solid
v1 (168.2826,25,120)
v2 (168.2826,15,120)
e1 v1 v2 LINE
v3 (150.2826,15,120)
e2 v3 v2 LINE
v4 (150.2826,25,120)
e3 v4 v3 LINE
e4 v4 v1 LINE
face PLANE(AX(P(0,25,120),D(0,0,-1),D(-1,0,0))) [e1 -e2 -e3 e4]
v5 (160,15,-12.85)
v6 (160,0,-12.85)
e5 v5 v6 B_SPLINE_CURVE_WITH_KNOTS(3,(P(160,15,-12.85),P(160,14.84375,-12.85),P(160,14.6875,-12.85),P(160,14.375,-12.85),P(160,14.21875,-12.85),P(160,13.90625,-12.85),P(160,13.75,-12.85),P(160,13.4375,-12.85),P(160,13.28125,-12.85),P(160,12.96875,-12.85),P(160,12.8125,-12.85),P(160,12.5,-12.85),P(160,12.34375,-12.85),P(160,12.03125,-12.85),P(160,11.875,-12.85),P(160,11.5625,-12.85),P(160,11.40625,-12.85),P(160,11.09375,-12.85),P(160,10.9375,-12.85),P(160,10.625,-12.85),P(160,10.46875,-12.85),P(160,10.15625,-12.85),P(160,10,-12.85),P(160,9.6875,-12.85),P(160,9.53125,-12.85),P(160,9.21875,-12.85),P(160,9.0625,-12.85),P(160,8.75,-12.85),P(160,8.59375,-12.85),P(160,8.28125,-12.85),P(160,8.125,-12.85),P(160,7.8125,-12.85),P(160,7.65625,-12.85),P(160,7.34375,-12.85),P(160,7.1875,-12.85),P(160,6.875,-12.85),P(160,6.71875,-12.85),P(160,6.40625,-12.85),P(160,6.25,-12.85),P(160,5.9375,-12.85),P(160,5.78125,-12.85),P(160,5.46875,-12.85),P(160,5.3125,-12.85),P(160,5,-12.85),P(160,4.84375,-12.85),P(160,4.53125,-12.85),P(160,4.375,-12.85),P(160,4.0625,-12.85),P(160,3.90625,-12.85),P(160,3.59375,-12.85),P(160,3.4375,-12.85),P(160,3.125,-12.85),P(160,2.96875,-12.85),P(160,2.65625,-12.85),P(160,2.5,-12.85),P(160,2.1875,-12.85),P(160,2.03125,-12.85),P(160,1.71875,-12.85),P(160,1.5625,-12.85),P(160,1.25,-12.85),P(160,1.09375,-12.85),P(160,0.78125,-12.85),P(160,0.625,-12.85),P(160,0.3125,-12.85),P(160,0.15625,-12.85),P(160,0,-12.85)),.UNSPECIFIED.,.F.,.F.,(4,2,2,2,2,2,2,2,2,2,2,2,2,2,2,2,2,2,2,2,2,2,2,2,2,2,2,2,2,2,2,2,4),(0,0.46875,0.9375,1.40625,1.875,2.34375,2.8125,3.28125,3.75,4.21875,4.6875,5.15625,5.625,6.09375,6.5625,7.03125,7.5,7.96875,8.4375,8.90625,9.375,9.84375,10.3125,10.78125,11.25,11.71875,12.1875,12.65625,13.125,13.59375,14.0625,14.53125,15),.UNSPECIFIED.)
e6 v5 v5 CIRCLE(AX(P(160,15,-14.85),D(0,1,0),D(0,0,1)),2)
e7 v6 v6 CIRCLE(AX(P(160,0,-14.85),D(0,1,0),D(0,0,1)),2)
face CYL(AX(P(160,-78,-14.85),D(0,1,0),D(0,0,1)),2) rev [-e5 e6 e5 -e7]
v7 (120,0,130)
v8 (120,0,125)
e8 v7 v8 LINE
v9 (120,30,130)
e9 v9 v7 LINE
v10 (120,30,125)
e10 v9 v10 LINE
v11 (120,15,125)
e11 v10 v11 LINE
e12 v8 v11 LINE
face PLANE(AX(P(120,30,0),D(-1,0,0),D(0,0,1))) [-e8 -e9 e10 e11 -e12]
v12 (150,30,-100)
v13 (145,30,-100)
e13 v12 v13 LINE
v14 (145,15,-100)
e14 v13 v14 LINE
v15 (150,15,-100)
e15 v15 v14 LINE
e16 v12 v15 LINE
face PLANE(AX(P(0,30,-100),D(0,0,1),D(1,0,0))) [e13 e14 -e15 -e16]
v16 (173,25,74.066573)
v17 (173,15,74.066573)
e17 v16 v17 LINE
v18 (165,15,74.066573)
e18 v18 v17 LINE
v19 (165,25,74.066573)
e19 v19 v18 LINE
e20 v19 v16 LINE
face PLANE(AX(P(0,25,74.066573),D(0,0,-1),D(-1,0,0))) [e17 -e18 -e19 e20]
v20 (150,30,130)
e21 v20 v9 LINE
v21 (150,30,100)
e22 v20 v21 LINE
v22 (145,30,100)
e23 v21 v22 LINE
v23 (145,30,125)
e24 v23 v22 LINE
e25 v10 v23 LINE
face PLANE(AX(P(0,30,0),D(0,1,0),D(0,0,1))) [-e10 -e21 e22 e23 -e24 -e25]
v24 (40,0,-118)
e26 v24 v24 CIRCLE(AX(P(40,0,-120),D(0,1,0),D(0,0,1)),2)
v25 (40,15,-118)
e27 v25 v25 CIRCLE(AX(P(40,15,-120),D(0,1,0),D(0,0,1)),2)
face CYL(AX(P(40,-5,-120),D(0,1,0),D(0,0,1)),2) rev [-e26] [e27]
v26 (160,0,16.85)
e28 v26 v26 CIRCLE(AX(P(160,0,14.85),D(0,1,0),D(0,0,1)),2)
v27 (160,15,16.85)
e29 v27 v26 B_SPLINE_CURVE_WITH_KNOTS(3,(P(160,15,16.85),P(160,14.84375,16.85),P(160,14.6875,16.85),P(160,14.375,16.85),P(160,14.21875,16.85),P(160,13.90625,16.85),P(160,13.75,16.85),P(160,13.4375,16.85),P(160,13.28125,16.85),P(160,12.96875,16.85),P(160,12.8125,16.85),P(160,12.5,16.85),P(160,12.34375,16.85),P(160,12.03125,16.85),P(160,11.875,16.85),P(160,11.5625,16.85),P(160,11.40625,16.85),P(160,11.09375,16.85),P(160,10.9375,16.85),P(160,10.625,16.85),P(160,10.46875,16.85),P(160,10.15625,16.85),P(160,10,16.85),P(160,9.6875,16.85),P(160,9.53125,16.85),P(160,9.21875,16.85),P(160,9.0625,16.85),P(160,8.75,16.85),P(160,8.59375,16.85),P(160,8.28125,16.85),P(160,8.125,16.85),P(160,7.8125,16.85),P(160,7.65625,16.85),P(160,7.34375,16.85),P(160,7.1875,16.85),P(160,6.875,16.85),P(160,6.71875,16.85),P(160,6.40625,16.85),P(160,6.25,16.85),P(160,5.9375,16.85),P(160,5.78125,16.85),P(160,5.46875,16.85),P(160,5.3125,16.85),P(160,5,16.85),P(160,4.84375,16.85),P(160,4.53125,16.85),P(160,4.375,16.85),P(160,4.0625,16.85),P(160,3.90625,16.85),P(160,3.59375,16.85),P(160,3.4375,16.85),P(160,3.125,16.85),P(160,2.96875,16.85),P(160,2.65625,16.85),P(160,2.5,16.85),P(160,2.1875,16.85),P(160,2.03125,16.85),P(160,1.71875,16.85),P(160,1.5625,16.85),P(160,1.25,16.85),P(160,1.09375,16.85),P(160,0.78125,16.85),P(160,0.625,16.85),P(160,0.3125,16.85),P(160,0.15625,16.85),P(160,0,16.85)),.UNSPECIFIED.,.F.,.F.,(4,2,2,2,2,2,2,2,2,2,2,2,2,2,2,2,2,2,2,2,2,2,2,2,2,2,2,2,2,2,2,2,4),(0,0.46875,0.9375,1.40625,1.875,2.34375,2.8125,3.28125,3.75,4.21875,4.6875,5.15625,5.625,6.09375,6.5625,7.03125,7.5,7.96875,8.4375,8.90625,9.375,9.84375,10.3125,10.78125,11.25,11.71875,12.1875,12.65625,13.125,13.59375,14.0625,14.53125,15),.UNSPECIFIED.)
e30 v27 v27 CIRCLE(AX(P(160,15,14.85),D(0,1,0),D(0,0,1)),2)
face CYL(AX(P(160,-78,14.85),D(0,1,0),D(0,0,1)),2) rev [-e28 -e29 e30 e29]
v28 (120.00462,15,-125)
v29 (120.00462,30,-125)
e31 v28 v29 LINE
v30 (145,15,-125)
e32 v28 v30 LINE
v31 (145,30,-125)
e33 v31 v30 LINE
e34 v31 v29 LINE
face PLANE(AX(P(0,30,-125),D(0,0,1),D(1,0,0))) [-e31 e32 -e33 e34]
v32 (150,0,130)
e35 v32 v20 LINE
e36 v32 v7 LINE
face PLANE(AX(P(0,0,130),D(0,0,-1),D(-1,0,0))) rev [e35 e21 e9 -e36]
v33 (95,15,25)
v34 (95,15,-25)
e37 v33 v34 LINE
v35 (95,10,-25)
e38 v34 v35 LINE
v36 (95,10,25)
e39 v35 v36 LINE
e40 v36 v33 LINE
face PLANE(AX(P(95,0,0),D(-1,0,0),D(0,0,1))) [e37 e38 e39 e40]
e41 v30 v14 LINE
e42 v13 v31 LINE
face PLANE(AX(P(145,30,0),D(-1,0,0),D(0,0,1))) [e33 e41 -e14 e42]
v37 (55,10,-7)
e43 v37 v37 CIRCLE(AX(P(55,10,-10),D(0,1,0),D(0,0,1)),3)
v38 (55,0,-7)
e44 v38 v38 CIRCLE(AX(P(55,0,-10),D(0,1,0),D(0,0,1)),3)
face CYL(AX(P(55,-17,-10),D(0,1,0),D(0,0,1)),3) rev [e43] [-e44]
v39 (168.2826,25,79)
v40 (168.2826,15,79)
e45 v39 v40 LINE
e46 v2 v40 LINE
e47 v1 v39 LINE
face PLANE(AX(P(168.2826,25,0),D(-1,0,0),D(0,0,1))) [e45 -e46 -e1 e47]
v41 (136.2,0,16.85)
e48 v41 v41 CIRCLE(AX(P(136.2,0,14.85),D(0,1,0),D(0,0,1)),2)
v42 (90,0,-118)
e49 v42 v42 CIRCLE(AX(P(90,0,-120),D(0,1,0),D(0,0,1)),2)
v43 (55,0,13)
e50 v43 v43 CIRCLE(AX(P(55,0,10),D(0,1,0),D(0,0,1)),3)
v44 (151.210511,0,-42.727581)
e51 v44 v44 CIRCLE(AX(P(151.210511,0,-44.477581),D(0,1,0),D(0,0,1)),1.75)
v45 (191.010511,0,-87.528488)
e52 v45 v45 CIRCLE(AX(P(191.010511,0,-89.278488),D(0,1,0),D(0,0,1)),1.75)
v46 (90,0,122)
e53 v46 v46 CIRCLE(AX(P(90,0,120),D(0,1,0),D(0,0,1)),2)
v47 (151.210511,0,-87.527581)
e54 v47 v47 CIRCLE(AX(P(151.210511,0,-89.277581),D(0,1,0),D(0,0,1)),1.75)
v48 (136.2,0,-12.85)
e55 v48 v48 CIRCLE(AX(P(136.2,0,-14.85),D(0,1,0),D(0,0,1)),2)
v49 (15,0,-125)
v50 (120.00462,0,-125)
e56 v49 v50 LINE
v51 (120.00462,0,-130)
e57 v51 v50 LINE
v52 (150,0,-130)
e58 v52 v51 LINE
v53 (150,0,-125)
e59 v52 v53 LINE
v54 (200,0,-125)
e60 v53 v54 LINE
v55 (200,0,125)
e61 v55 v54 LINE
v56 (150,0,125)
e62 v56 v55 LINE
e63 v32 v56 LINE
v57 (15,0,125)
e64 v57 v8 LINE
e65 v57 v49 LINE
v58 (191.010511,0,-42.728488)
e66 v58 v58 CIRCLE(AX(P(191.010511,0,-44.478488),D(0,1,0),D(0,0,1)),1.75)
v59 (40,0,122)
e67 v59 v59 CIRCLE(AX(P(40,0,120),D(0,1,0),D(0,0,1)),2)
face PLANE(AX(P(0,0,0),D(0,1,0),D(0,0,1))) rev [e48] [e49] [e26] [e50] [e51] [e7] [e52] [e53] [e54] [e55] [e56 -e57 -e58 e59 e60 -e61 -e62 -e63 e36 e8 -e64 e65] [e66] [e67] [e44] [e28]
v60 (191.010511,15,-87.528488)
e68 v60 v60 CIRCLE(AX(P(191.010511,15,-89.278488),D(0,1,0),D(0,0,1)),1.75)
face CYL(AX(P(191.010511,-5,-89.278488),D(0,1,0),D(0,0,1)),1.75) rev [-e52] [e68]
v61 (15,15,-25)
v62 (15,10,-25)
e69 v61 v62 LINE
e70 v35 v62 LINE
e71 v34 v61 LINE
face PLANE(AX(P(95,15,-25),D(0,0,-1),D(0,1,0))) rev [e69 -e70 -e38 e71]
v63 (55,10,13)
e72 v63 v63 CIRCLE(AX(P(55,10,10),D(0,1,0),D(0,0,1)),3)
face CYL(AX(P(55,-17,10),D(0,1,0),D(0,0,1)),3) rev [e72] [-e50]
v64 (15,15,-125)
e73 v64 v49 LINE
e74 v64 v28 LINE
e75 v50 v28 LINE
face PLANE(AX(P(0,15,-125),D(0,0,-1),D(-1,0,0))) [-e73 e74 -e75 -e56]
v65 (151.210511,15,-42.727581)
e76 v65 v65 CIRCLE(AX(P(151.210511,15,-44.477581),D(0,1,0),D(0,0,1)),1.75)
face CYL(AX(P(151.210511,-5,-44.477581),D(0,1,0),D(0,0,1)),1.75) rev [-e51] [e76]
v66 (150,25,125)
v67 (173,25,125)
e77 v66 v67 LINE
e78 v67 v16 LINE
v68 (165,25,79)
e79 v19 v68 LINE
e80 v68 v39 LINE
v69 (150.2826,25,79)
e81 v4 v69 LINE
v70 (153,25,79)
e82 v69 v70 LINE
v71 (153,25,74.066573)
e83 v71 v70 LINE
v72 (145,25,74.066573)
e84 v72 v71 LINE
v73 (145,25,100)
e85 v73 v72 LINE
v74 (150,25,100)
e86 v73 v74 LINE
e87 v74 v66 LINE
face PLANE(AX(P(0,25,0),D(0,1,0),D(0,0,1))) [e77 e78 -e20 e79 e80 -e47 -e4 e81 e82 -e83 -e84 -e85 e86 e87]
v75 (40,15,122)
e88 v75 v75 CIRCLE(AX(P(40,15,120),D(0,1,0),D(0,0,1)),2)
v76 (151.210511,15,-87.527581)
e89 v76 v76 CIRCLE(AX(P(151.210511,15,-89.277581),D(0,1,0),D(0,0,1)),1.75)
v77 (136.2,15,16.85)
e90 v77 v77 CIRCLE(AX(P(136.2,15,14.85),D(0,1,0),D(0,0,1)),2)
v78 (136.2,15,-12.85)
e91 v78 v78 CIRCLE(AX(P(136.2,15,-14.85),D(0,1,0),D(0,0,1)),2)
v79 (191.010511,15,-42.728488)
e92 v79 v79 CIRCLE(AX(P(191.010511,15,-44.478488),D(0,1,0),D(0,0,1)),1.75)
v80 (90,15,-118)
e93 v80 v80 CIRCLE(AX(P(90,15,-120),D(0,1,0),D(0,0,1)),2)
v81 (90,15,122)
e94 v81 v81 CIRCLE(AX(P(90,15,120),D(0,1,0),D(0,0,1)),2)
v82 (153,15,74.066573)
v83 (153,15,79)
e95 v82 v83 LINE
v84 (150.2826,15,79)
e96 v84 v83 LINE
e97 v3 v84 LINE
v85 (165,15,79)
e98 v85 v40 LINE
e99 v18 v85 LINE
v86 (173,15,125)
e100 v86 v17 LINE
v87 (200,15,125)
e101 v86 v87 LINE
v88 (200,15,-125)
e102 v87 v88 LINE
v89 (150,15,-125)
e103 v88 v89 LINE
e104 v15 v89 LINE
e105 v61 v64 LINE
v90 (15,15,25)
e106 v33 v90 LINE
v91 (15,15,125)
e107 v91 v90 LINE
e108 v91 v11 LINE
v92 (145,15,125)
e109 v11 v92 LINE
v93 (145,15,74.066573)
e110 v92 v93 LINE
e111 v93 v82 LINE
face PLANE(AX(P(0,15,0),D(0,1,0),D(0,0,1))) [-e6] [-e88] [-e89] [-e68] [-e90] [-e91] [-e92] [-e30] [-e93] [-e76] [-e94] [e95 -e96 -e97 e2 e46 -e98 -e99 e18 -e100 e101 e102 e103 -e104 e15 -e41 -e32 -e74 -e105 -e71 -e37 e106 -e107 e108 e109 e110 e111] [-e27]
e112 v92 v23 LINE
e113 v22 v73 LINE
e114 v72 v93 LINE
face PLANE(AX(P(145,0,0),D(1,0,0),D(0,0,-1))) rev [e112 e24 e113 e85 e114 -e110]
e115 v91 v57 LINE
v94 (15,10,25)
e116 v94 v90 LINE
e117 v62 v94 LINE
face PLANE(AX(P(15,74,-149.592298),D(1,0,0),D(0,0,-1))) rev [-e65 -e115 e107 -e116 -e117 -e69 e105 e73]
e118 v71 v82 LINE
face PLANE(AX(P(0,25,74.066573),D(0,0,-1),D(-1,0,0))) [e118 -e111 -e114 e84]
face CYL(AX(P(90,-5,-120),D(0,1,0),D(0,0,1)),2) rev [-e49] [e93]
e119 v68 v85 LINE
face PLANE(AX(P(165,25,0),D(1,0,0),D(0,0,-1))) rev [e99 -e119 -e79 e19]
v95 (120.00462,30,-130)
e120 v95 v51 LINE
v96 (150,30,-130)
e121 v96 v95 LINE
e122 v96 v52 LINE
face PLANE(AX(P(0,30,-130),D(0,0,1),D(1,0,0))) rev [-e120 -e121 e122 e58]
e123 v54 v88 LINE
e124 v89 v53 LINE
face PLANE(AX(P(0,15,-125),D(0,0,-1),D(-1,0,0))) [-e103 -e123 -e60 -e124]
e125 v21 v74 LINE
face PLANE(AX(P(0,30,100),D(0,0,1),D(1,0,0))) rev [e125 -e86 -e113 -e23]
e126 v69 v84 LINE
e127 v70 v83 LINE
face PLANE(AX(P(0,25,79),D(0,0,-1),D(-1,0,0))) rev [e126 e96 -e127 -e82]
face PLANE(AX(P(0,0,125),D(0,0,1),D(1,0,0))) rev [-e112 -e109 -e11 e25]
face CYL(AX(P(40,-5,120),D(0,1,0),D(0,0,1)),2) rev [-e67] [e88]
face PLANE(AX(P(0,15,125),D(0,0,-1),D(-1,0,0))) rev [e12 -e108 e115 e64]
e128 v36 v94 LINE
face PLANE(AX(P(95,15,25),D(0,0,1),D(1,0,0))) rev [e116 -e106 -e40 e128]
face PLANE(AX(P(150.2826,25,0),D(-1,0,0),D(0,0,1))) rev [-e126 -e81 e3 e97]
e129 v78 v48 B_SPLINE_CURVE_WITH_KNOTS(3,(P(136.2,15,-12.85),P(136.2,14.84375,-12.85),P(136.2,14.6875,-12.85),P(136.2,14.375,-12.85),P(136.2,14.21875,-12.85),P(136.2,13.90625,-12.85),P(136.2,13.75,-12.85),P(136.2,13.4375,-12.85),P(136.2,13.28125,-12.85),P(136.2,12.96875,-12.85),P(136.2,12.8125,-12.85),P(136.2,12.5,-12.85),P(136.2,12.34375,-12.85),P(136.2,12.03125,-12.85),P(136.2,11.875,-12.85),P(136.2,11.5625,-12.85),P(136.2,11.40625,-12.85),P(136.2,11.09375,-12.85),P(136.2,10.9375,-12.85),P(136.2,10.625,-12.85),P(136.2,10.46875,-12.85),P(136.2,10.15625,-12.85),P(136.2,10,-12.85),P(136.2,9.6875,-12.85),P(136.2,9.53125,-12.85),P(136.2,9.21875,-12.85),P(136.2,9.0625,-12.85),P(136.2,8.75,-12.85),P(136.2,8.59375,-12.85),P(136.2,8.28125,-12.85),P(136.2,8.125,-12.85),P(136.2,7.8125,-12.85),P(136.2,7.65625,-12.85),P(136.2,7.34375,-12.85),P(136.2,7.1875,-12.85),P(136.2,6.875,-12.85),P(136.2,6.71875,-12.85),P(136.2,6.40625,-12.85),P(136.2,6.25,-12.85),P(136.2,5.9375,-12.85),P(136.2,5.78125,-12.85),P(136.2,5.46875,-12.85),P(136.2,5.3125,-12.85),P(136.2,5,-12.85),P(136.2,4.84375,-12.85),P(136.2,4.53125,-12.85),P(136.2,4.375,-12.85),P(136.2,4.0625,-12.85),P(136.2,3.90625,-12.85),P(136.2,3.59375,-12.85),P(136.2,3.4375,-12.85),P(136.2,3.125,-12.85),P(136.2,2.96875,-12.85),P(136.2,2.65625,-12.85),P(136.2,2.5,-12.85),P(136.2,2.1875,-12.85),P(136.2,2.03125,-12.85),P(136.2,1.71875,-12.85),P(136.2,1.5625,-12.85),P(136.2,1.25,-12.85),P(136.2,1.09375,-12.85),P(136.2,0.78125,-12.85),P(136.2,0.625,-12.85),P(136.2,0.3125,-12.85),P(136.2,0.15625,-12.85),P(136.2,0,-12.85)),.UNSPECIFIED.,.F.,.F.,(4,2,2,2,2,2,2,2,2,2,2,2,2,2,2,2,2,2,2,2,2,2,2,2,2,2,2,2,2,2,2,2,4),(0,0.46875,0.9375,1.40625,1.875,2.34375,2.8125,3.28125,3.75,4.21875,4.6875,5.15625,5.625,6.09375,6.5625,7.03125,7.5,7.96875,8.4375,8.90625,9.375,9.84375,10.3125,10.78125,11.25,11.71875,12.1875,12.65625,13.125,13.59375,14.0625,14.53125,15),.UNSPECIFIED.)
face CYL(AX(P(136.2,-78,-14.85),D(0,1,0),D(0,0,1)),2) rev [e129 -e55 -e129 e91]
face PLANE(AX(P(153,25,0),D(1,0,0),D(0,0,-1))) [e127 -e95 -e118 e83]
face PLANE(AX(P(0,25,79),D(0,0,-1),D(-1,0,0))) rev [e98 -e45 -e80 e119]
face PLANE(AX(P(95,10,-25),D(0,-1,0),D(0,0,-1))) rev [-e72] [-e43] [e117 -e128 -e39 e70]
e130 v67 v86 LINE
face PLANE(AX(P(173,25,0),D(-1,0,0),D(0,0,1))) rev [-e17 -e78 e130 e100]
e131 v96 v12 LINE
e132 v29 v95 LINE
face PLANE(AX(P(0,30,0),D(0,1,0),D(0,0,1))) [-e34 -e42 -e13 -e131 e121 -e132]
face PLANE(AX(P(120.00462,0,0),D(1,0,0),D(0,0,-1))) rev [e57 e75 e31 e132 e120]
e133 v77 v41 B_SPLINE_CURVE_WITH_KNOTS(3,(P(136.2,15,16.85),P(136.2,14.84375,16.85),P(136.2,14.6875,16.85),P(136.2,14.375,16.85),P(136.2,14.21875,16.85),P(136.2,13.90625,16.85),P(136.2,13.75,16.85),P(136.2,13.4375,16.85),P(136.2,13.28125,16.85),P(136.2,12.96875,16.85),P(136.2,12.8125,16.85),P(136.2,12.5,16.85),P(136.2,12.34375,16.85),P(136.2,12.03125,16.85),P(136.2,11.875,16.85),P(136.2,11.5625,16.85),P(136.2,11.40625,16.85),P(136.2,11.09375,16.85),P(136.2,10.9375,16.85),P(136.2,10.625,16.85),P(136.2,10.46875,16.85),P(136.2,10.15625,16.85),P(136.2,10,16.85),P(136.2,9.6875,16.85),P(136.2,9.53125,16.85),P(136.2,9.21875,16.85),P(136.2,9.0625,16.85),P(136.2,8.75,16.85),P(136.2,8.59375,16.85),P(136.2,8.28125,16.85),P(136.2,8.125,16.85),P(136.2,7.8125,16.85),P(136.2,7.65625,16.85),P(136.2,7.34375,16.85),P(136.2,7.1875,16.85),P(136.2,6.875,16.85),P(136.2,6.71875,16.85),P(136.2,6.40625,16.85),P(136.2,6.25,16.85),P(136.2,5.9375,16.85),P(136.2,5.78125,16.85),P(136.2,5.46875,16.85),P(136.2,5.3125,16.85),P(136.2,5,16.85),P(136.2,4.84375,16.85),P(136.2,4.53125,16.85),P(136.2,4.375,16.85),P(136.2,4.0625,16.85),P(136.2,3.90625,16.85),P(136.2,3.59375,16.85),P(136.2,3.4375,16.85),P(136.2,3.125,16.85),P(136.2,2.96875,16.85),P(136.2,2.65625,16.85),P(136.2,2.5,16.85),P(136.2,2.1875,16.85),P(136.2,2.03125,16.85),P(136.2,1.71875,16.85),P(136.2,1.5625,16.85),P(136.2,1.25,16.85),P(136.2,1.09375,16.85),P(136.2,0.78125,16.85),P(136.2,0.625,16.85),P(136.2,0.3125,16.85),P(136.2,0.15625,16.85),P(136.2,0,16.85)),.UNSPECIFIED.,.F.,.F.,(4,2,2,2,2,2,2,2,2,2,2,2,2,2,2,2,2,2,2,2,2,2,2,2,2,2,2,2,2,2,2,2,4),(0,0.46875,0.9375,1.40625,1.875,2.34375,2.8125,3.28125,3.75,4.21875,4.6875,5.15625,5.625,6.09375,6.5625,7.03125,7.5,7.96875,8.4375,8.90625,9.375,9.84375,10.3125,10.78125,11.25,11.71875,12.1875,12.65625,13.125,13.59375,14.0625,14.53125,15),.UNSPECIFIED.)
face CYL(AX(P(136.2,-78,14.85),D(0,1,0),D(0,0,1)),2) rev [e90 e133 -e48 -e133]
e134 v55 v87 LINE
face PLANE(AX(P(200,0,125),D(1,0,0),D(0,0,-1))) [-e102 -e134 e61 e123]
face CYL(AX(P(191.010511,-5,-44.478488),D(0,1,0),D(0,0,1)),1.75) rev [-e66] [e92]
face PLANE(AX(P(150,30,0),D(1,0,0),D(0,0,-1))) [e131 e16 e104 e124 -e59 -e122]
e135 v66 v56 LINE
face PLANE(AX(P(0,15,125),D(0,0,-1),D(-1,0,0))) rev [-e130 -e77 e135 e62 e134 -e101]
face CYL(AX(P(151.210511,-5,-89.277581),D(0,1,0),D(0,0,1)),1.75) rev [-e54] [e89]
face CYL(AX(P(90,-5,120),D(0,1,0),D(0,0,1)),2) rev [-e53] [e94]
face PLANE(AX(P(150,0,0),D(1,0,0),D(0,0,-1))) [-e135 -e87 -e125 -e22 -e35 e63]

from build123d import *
from OCP.BRepFilletAPI import BRepFilletAPI_MakeChamfer

# Parameters (mm, degrees)
AUFSATZ_LINEAR_AUSTRAGEN1_DEPTH      = 15
SKIZZE2_W                            = 5
SKIZZE2_H                            = 4
SKIZZE2_H_2                          = 3
AUFSATZ_LINEAR_AUSTRAGEN2_DEPTH      = 37
AUFSATZ_LINEAR_AUSTRAGEN3_DEPTH      = 15
SKIZZE4_W                            = 5
SKIZZE4_H                            = 250
AUFSATZ_LINEAR_AUSTRAGEN4_DEPTH      = 15
SKIZZE5_W                            = 30
SKIZZE5_H                            = 5
AUFSATZ_LINEAR_AUSTRAGEN5_DEPTH      = 30
AUFSATZ_LINEAR_AUSTRAGEN6_DEPTH      = 15
AUFSATZ_LINEAR_AUSTRAGEN6_2_DEPTH    = 15
SKIZZE7_W                            = 5
SKIZZE7_H                            = 5
AUFSATZ_LINEAR_AUSTRAGEN7_DEPTH      = 15
AUFSATZ_LINEAR_AUSTRAGEN8_DEPTH      = 15
AUFSATZ_LINEAR_AUSTRAGEN8_DEPTH_BACK = 15
SKIZZE8_W                            = 5
SKIZZE8_H                            = 30.74644599
SKIZZE8_H_2                          = 29.008771532
SKIZZE9_W                            = 5
SKIZZE9_H                            = 5
AUFSATZ_LINEAR_AUSTRAGEN10_DEPTH     = 15
SKIZZE10_W                           = 5
SKIZZE10_H                           = 30
SCHNITT_LINEAR_AUSTRAGEN1_DEPTH      = 1.01
SKIZZE12_W                           = 10.711230156
SKIZZE12_H                           = 5
SKIZZE12_W_2                         = 5
SKIZZE12_H_2                         = 5.74644599
SKIZZE12_H_3                         = 4.008771532
SKIZZE12_W_3                         = 18.406645612
SKIZZE12_H_4                         = 11.130363441
SKIZZE12_W_4                         = 9.588104439
SKIZZE12_H_5                         = 13.193622238
SCHNITT_LINEAR_AUSTRAGEN2_DEPTH      = 15
SKIZZE13_W                           = 10.711230156
SKIZZE13_H                           = 5
SKIZZE13_W_2                         = 9.588104439
SKIZZE13_W_3                         = 5
SKIZZE13_H_2                         = 13.193622238
SKIZZE13_H_3                         = 11.130363441
SKIZZE13_W_4                         = 18.406645612
SCHNITT_LINEAR_AUSTRAGEN3_DEPTH      = 15
SKIZZE14_W                           = 50
SKIZZE14_H                           = 50
SKIZZE14_W_2                         = 20
AUFSATZ_LINEAR_AUSTRAGEN11_DEPTH     = 20
FASE2_SIZE                           = 20
FASE2_SIZE2                          = 50
FASE3_SIZE                           = 20
FASE3_SIZE2                          = 35
FASE4_SIZE                           = 20
SKIZZE15_R                           = 10
SKIZZE15_R_2                         = 7.5
AUFSATZ_LINEAR_AUSTRAGEN12_DEPTH     = 3
VERRUNDUNG1_R                        = 10
SKIZZE18_R                           = 10
SKIZZE18_R_2                         = 7.5
AUFSATZ_LINEAR_AUSTRAGEN13_DEPTH     = 3
VERRUNDUNG2_R                        = 10
SKIZZE19_R                           = 10
AUFSATZ_LINEAR_AUSTRAGEN14_DEPTH     = 3
VERRUNDUNG3_R                        = 10
SKIZZE20_R                           = 1.5
SCHNITT_LINEAR_AUSTRAGEN4_DEPTH      = 250
SKIZZE21_W                           = 4
SKIZZE21_H                           = 7
SKIZZE21_H_2                         = 5.2
SKIZZE21_W_2                         = 41
AUFSATZ_LINEAR_AUSTRAGEN15_DEPTH     = 10
SKIZZE22_R                           = 1.75
SCHNITT_LINEAR_AUSTRAGEN5_DEPTH      = 20
SCHNITT_LINEAR_AUSTRAGEN6_DEPTH      = 59
SCHNITT_LINEAR_AUSTRAGEN6_DEPTH_BACK = 47
SKIZZE23_W                           = 190
SKIZZE23_H                           = 302.641157469
SKIZZE24_W                           = 50
SKIZZE24_H                           = 5
SCHNITT_LINEAR_AUSTRAGEN7_DEPTH      = 80
SKIZZE25_R                           = 12.5
SCHNITT_LINEAR_AUSTRAGEN8_DEPTH      = 80
SKIZZE26_R                           = 17.590862423
AUFSATZ_LINEAR_AUSTRAGEN16_DEPTH     = 10
SKIZZE27_R                           = 3
SCHNITT_LINEAR_AUSTRAGEN10_DEPTH     = 93
SKIZZE28_R                           = 2
SCHNITT_LINEAR_AUSTRAGEN11_DEPTH     = 93
SKIZZE29_R                           = 2
SCHNITT_LINEAR_AUSTRAGEN13_DEPTH     = 20
SKIZZE30_W                           = 80
SKIZZE30_H                           = 50
AUFSATZ_LINEAR_AUSTRAGEN17_DEPTH     = 7
SKIZZE31_R                           = 3
SCHNITT_LINEAR_AUSTRAGEN14_DEPTH     = 27
AUFSATZ_LINEAR_START                 = -9
SKIZZE32_R                           = 3
SKIZZE32_R_2                         = 3.723627145
SKIZZE32_R_3                         = 5.253378479
SKIZZE32_R_4                         = 5.58705402
AUFSATZ_LINEAR_AUSTRAGEN18_DEPTH     = 9
SKIZZE35_R                           = 1.75
SCHNITT_LINEAR_AUSTRAGEN16_DEPTH     = 20
SKIZZE36_R                           = 6.846616126
SKIZZE36_R_2                         = 4.471320942
SKIZZE36_R_3                         = 4.89424988
SKIZZE36_R_4                         = 3.525123697
AUFSATZ_LINEAR_AUSTRAGEN19_DEPTH     = 15
SKIZZE39_W                           = 50
SKIZZE39_H                           = 250
SCHNITT_LINEAR_AUSTRAGEN17_DEPTH     = 57
SKIZZE40_W                           = 11.456450468
SKIZZE40_H                           = 117.894868185
SCHNITT_LINEAR_AUSTRAGEN18_DEPTH     = 86
SKIZZE41_W                           = 5.359084078
SKIZZE41_H                           = 0.710531035
SCHNITT_LINEAR_AUSTRAGEN19_DEPTH     = 69
AUFSATZ_LINEAR_AUSTRAGEN20_DEPTH     = 10


with BuildPart() as part:
    # Skizze1 → Aufsatz-Linear austragen1 (new body)
    with BuildSketch(Plane(origin=(0, 0, 0), x_dir=(1, 0, 0), z_dir=(0, 1, 0))):
        Polygon((-105, 65), (-175, 65), (-175, -65), (-105, -65), (-105, -125), (145, -125), (185, -20), (175, -20), (175, 0), (175, 20), (185, 20), (145, 125), (-105, 125), align=None)
        Polygon((175, 0), (175, 20), (185, 20), (185, 0), (185, -20), (175, -20), align=None)
    extrude(amount=AUFSATZ_LINEAR_AUSTRAGEN1_DEPTH)

    # Skizze2 → Aufsatz-Linear austragen2 (add)
    with BuildSketch(Plane(origin=(0, 15, 0), x_dir=(1, 0, 0), z_dir=(0, 1, 0))):
        with Locations((-122.5, -40)):
            Rectangle(SKIZZE2_W, SKIZZE2_H)
        with Locations((-122.5, 40)):
            Rectangle(SKIZZE2_W, SKIZZE2_H)
        with Locations((-122.5, 63.5)):
            Rectangle(SKIZZE2_W, SKIZZE2_H_2)
        with Locations((-122.5, -63.5)):
            Rectangle(SKIZZE2_W, SKIZZE2_H_2)
    extrude(amount=-AUFSATZ_LINEAR_AUSTRAGEN2_DEPTH)

    # Skizze3 → Aufsatz-Linear austragen3 (add)
    with BuildSketch(Plane(origin=(0, 15, 0), x_dir=(1, 0, 0), z_dir=(0, 1, 0))):
        Polygon((145, -125), (195, -125), (195, 125), (145, 125), (185, 20), (185, -20), align=None)
    extrude(amount=-AUFSATZ_LINEAR_AUSTRAGEN3_DEPTH)

    # Skizze4 → Aufsatz-Linear austragen4 (add)
    with BuildSketch(Plane(origin=(0, 15, 0), x_dir=(1, 0, 0), z_dir=(0, 1, 0))):
        with Locations((197.5, 0)):
            Rectangle(SKIZZE4_W, SKIZZE4_H)
    extrude(amount=-AUFSATZ_LINEAR_AUSTRAGEN4_DEPTH)

    # Skizze5 → Aufsatz-Linear austragen5 (add)
    with BuildSketch(Plane(origin=(0, 15, 0), x_dir=(1, 0, 0), z_dir=(0, 1, 0))):
        with Locations((-90, 122.5)):
            Rectangle(SKIZZE5_W, SKIZZE5_H)
        with Locations((-90, -122.5)):
            Rectangle(SKIZZE5_W, SKIZZE5_H)
    extrude(amount=-AUFSATZ_LINEAR_AUSTRAGEN5_DEPTH)



with BuildPart() as body_2:
    # Skizze6 → Aufsatz-Linear austragen6 (new body)
    with BuildSketch(Plane(origin=(0, 15, 0), x_dir=(1, 0, 0), z_dir=(0, 1, 0))):
        Polygon((-61.593354388, 130), (-110, 130), (-110, 88.869636559), (-105, 88.869636559), (-105, 125), (-61.593354388, 125), align=None)
    extrude(amount=AUFSATZ_LINEAR_AUSTRAGEN6_DEPTH)


with BuildPart() as body_3:
    # Skizze6 → Aufsatz-Linear austragen6 2 (new body)
    with BuildSketch(Plane(origin=(0, 15, 0), x_dir=(1, 0, 0), z_dir=(0, 1, 0))):
        Polygon((-110, -86.806377762), (-110, -130), (-70.411895561, -130), (-70.411895561, -125), (-105, -125), (-105, -86.806377762), align=None)
    extrude(amount=AUFSATZ_LINEAR_AUSTRAGEN6_2_DEPTH)


with BuildPart() as part_1:
    add(part.part)

    add(body_2.part)  # Aufsatz-Linear austragen7 merges body 2

    add(body_3.part)  # Aufsatz-Linear austragen7 merges body 3
    # Skizze7 → Aufsatz-Linear austragen7 (add)
    with BuildSketch(Plane.XZ):
        Polygon((-110, -88.869636559), (-110, -125), (-105, -125), (-105, -120), (-105, -88.869636559), align=None)
        with Locations((-107.5, -127.5)):
            Rectangle(SKIZZE7_W, SKIZZE7_H)
        Polygon((-105, -125), (-105, -130), (-61.593354388, -130), (-61.593354388, -125), (-75, -125), align=None)
        Polygon((-105, 125), (-110, 125), (-110, 86.806377762), (-105, 86.806377762), (-105, 120), align=None)
        with Locations((-107.5, 127.5)):
            Rectangle(SKIZZE7_W, SKIZZE7_H)
        Polygon((-70.411895561, 130), (-105, 130), (-105, 125), (-75, 125), (-70.411895561, 125), align=None)
    extrude(amount=-AUFSATZ_LINEAR_AUSTRAGEN7_DEPTH)

    # Skizze8 → Aufsatz-Linear austragen8 (add, two sides: drawn at the far end of the back side and taken through both)
    with BuildSketch(Plane(origin=(0, 15, 0), x_dir=(1, 0, 0), z_dir=(0, 1, 0)).offset(-AUFSATZ_LINEAR_AUSTRAGEN8_DEPTH_BACK)):
        with Locations((147.5, -109.626777005)):
            Rectangle(SKIZZE8_W, SKIZZE8_H)
        Polygon((145, -125), (109.288769844, -125), (109.288769844, -130), (150, -130), (150, -125), align=None)
        with Locations((147.5, 110.495614234)):
            Rectangle(SKIZZE8_W, SKIZZE8_H_2)
        Polygon((118.994620346, 130), (118.994620346, 125), (145, 125), (150, 125), (150, 130), align=None)
    extrude(amount=AUFSATZ_LINEAR_AUSTRAGEN8_DEPTH + AUFSATZ_LINEAR_AUSTRAGEN8_DEPTH_BACK)

    # Skizze9 → Aufsatz-Linear austragen10 (add)
    with BuildSketch(Plane(origin=(0, 15, 0), x_dir=(1, 0, 0), z_dir=(0, 1, 0))):
        Polygon((145, 4), (150, 4), (150, 9), (150, 14), (145, 14), align=None)
        with Locations((152.5, 6.5)):
            Rectangle(SKIZZE9_W, SKIZZE9_H)
        Polygon((190, 4), (200, 4), (200, 14), (196, 14), (196, 9), (190, 9), align=None)
        Polygon((196, 105), (200, 105), (200, 125), (150, 125), (150, 120), (196, 120), align=None)
    extrude(amount=AUFSATZ_LINEAR_AUSTRAGEN10_DEPTH)

    # Skizze10 → Schnitt-Linear austragen1 (cut)
    with BuildSketch(Plane.ZY.offset(-118.994620346)):
        with Locations((-127.5, 15)):
            Rectangle(SKIZZE10_W, SKIZZE10_H)
    extrude(amount=-SCHNITT_LINEAR_AUSTRAGEN1_DEPTH, mode=Mode.SUBTRACT)

    # Skizze12 → Schnitt-Linear austragen2 (cut)
    with BuildSketch(Plane(origin=(0, 15, 0), x_dir=(1, 0, 0), z_dir=(0, 1, 0))):
        with Locations((114.644384922, -127.5)):
            Rectangle(SKIZZE12_W, SKIZZE12_H)
        with Locations((147.5, -97.126777005)):
            Rectangle(SKIZZE12_W_2, SKIZZE12_H_2)
        with Locations((147.5, 97.995614234)):
            Rectangle(SKIZZE12_W_2, SKIZZE12_H_3)
        with Locations((-70.796677194, 127.5)):
            Rectangle(SKIZZE12_W_3, SKIZZE12_H)
        with Locations((-107.5, 94.43481828)):
            Rectangle(SKIZZE12_W_2, SKIZZE12_H_4)
        with Locations((-75.20594778, -127.5)):
            Rectangle(SKIZZE12_W_4, SKIZZE12_H)
        with Locations((-107.5, -93.403188881)):
            Rectangle(SKIZZE12_W_2, SKIZZE12_H_5)
    extrude(amount=SCHNITT_LINEAR_AUSTRAGEN2_DEPTH, mode=Mode.SUBTRACT)

    # Skizze13 → Schnitt-Linear austragen3 (cut)
    with BuildSketch(Plane(origin=(0, 15, 0), x_dir=(1, 0, 0), z_dir=(0, 1, 0))):
        with Locations((114.644384922, -127.5)):
            Rectangle(SKIZZE13_W, SKIZZE13_H)
        with Locations((-75.20594778, -127.5)):
            Rectangle(SKIZZE13_W_2, SKIZZE13_H)
        with Locations((-107.5, -93.403188881)):
            Rectangle(SKIZZE13_W_3, SKIZZE13_H_2)
        with Locations((-107.5, 94.43481828)):
            Rectangle(SKIZZE13_W_3, SKIZZE13_H_3)
        with Locations((-70.796677194, 127.5)):
            Rectangle(SKIZZE13_W_4, SKIZZE13_H)
    extrude(amount=-SCHNITT_LINEAR_AUSTRAGEN3_DEPTH, mode=Mode.SUBTRACT)

    # Skizze14 → Aufsatz-Linear austragen11 (add)
    with BuildSketch(Plane(origin=(0, 15, 0), x_dir=(1, 0, 0), z_dir=(0, 1, 0))):
        Polygon((-175, -25), (-175, -65), (-105, -65), (-105, -25), (-125, -25), align=None)
        with Locations((-150, 0)):
            Rectangle(SKIZZE14_W, SKIZZE14_H)
        with Locations((-115, 0)):
            Rectangle(SKIZZE14_W_2, SKIZZE14_H)
        Polygon((-175, 65), (-175, 25), (-125, 25), (-105, 25), (-105, 65), align=None)
    extrude(amount=AUFSATZ_LINEAR_AUSTRAGEN11_DEPTH)

    # Fase2
    fase2_edges = [part_1.edges().sort_by_distance(p)[0] for p in [
        (-175, 35, 0),
    ]]
    fase2_side = [part_1.faces().sort_by_distance(p)[0] for p in [
        (-175, 17.5, 0),
    ]]
    chamfer(fase2_edges, length=FASE2_SIZE, length2=FASE2_SIZE2, reference=fase2_side[0])

    # Fase3: one chamfer whose edges measure the first distance from different faces: ONE call of the kernel's chamfer builder (chamfer() names one face for all edges)
    fase3_edges_1 = [part_1.edges().sort_by_distance(p)[0] for p in [
        (-115, 35, -65),
    ]]
    fase3_side_1 = [part_1.faces().sort_by_distance(p)[0] for p in [
        (-134.615695793, 13.348705502, -65),
    ]]
    fase3_edges_2 = [part_1.edges().sort_by_distance(p)[0] for p in [
        (-115, 35, 65),
    ]]
    fase3_side_2 = [part_1.faces().sort_by_distance(p)[0] for p in [
        (-134.615695793, 13.348705502, 65),
    ]]
    fase3 = BRepFilletAPI_MakeChamfer(part_1.part.solid().wrapped)
    for e in fase3_edges_1:
        fase3.Add(FASE3_SIZE, FASE3_SIZE2, e.wrapped, fase3_side_1[0].wrapped)  # the first distance lies on this face
    for e in fase3_edges_2:
        fase3.Add(FASE3_SIZE, FASE3_SIZE2, e.wrapped, fase3_side_2[0].wrapped)  # the first distance lies on this face
    add(Compound.cast(fase3.Shape()), mode=Mode.REPLACE)

    # Fase4
    fase4_edges = [part_1.edges().sort_by_distance(p)[0] for p in [
        (-150, 25, 47.5),
        (-150, 25, -47.5),
    ]]
    chamfer(fase4_edges, length=FASE4_SIZE)

    # Skizze15 → Aufsatz-Linear austragen12 (add)
    with BuildSketch(Plane(origin=(-11.551963806, 55.886277719, -15.432210402), x_dir=(0.9807222582245502, 0.18835756766165584, -0.05201229592628623), z_dir=(-0.19540688888301463, 0.9453426139004438, -0.2610430809673718))):
        with Locations(Location((-117.284914164, 20.601047932, 0), (0, 0, 270))):
            Circle(SKIZZE15_R)
        with Locations(Location((-142.839757147, 36.315690789, 0), (0, 0, 270))):
            Circle(SKIZZE15_R_2)
    extrude(amount=AUFSATZ_LINEAR_AUSTRAGEN12_DEPTH)

    # Verrundung1
    # the kernel refuses this fillet: 10 mm, written as the material it takes off along each edge
    with BuildSketch(Plane(origin=(-127.162110348, 31.147334465, -29.972945243), x_dir=(0, 0.26617432079083353, 0.963924909394678), z_dir=(-0.9807222582245501, -0.18835756766165582, 0.052012295926286305))) as verrundung1_piece_1:
        with BuildLine():
            CenterArc((2.858571571, -10), VERRUNDUNG1_R, 44.427004001, 45.572995999)
            Line((2.858571571, 0), (2.858571571, 0.2))
            Line((2.858571571, 0.2), (10, 0.2))
            Line((10, 0.2), (10.2, 0))
            ThreePointArc((10.2, 0), (10.2, -1.5), (10.142828569, -2.86))
            Line((10.142828569, -2.86), (10, -3))
        make_face()
    revolve(axis=Axis((-127.162110348, 31.147334465, -29.972945243), (-0.19540688888301466, 0.9453426139004438, -0.2610430809673718)), mode=Mode.SUBTRACT)
    with BuildSketch(Plane(origin=(-152.224313666, 22.15105201, -43.791514879), x_dir=(0, 0.26617432079083364, 0.9639249093946781), z_dir=(-0.9807222582245503, -0.18835756766165584, 0.052012295926286325))) as verrundung1_piece_2:
        with BuildLine():
            CenterArc((0.358571571, -10), VERRUNDUNG1_R, 44.427004001, 45.572995999)
            Line((0.358571571, 0), (0.358571571, 0.2))
            Line((0.358571571, 0.2), (7.5, 0.2))
            Line((7.5, 0.2), (7.7, 0))
            ThreePointArc((7.7, 0), (7.7, -1.5), (7.642828569, -2.86))
            Line((7.642828569, -2.86), (7.5, -3))
        make_face()
    revolve(axis=Axis((-152.224313666, 22.15105201, -43.791514879), (-0.19540688888301466, 0.9453426139004438, -0.2610430809673718)), mode=Mode.SUBTRACT)

    # Skizze18 → Aufsatz-Linear austragen13 (add)
    with BuildSketch(Plane(origin=(-11.551963806, 55.886277719, 15.432210402), x_dir=(0.9807222582245502, 0.18835756766165587, 0.05201229592628629), z_dir=(-0.19540688888301466, 0.9453426139004437, 0.261043080967372))):
        with Locations(Location((-117.284914164, -25.97894302, 0), (0, 0, 270))):
            Circle(SKIZZE18_R)
        with Locations(Location((-147.284914164, -39.72137923, 0), (0, 0, 270))):
            Circle(SKIZZE18_R_2)
    extrude(amount=AUFSATZ_LINEAR_AUSTRAGEN13_DEPTH)

    # Verrundung2
    # the kernel refuses this fillet: 10 mm, written as the material it takes off along each edge
    with BuildSketch(Plane(origin=(-127.162110348, 29.715876892, 35.156832279), x_dir=(0, -0.26617432079083353, 0.963924909394678), z_dir=(-0.98072225822455, -0.1883575676616558, -0.0520122959262863))) as verrundung2_piece_1:
        with BuildLine():
            CenterArc((2.858571571, -10), VERRUNDUNG2_R, 44.427004001, 45.572995999)
            Line((2.858571571, 0), (2.858571571, 0.2))
            Line((2.858571571, 0.2), (10, 0.2))
            Line((10, 0.2), (10.2, 0))
            ThreePointArc((10.2, 0), (10.2, -1.5), (10.142828569, -2.86))
            Line((10.142828569, -2.86), (10, -3))
        make_face()
    revolve(axis=Axis((-127.162110348, 29.715876892, 35.156832279), (-0.19540688888301463, 0.9453426139004436, 0.26104308096737205)), mode=Mode.SUBTRACT)
    with BuildSketch(Plane(origin=(-156.583778094, 20.407266239, 46.843139979), x_dir=(0, -0.26617432079083425, 0.9639249093946779), z_dir=(-0.9807222582245501, -0.18835756766165576, -0.05201229592628644))) as verrundung2_piece_2:
        with BuildLine():
            CenterArc((0.358571571, -10), VERRUNDUNG2_R, 44.427004001, 45.572995999)
            Line((0.358571571, 0), (0.358571571, 0.2))
            Line((0.358571571, 0.2), (7.5, 0.2))
            Line((7.5, 0.2), (7.7, 0))
            ThreePointArc((7.7, 0), (7.7, -1.5), (7.642828569, -2.86))
            Line((7.642828569, -2.86), (7.5, -3))
        make_face()
    revolve(axis=Axis((-156.583778094, 20.407266239, 46.843139979), (-0.19540688888301463, 0.9453426139004436, 0.26104308096737205)), mode=Mode.SUBTRACT)

    # Skizze19 → Aufsatz-Linear austragen14 (add)
    with BuildSketch(Plane(origin=(-29.310344828, 73.275862069, 0), x_dir=(0.9284766908852605, 0.371390676354101, 0), z_dir=(-0.371390676354101, 0.9284766908852605, 0))):
        with Locations(Location((-118.060912688, -0.063197478, 0), (0, 0, 180))):
            Circle(SKIZZE19_R)
        with Locations(Location((-139.860763151, 12.174715734, 0), (0, 0, 180))):
            Circle(SKIZZE19_R)
        with Locations(Location((-139.91256076, -12.208380744, 0), (0, 0, 180))):
            Circle(SKIZZE19_R)
    extrude(amount=AUFSATZ_LINEAR_AUSTRAGEN14_DEPTH)

    # Verrundung3
    # the kernel refuses this fillet: 10 mm, written as the material it takes off along each edge
    with BuildSketch(Plane(origin=(-140.041322392, 32.214569927, 0.063197478), x_dir=(-0.9284766908852606, -0.37139067635410067, 0), z_dir=(0, 0, -1))) as verrundung3_piece_1:
        with BuildLine():
            CenterArc((2.858571571, -10), VERRUNDUNG3_R, 44.427004001, 45.572995999)
            Line((2.858571571, 0), (2.858571571, 0.2))
            Line((2.858571571, 0.2), (10, 0.2))
            Line((10, 0.2), (10.2, 0))
            ThreePointArc((10.2, 0), (10.2, -1.5), (10.142828569, -2.86))
            Line((10.142828569, -2.86), (10, -3))
        make_face()
    revolve(axis=Axis((-140.041322392, 32.214569927, 0.063197478), (-0.371390676354101, 0.9284766908852605, 0)), mode=Mode.SUBTRACT)
    with BuildSketch(Plane(origin=(-160.281975412, 24.11830872, -12.174715734), x_dir=(-0.9284766908852602, -0.37139067635410167, 0), z_dir=(0, 0, -1))) as verrundung3_piece_2:
        with BuildLine():
            CenterArc((2.858571571, -10), VERRUNDUNG3_R, 44.427004001, 45.572995999)
            Line((2.858571571, 0), (2.858571571, 0.2))
            Line((2.858571571, 0.2), (10, 0.2))
            Line((10, 0.2), (10.2, 0))
            ThreePointArc((10.2, 0), (10.2, -1.5), (10.142828569, -2.86))
            Line((10.142828569, -2.86), (10, -3))
        make_face()
    revolve(axis=Axis((-160.281975412, 24.11830872, -12.174715734), (-0.371390676354101, 0.9284766908852605, 0)), mode=Mode.SUBTRACT)
    with BuildSketch(Plane(origin=(-160.330068284, 24.099071571, 12.208380744), x_dir=(-0.9284766908852602, -0.37139067635410167, 0), z_dir=(0, 0, -1))) as verrundung3_piece_3:
        with BuildLine():
            CenterArc((2.858571571, -10), VERRUNDUNG3_R, 44.427004001, 45.572995999)
            Line((2.858571571, 0), (2.858571571, 0.2))
            Line((2.858571571, 0.2), (10, 0.2))
            Line((10, 0.2), (10.2, 0))
            ThreePointArc((10.2, 0), (10.2, -1.5), (10.142828569, -2.86))
            Line((10.142828569, -2.86), (10, -3))
        make_face()
    revolve(axis=Axis((-160.330068284, 24.099071571, 12.208380744), (-0.371390676354101, 0.9284766908852605, 0)), mode=Mode.SUBTRACT)

    # Skizze20 → Schnitt-Linear austragen4 (cut)
    with BuildSketch(Plane(origin=(0, 0, -65), x_dir=(-1, 0, 0), z_dir=(0, 0, -1))):
        with Locations(Location((122.5, -19.5, 0), (0, 0, 180))):
            Circle(SKIZZE20_R)
        with Locations(Location((122.5, -2.5, 0), (0, 0, 180))):
            Circle(SKIZZE20_R)
    extrude(amount=-SCHNITT_LINEAR_AUSTRAGEN4_DEPTH, mode=Mode.SUBTRACT)

    # Skizze21 → Aufsatz-Linear austragen15 (add)
    with BuildSketch(Plane(origin=(0, 15, 0), x_dir=(1, 0, 0), z_dir=(0, 1, 0))):
        Polygon((145, -100), (150, -100), (191, -100), (191, -93), (145, -93), align=None)
        with Locations((193, -96.5)):
            Rectangle(SKIZZE21_W, SKIZZE21_H)
        with Locations((193, -102.6)):
            Rectangle(SKIZZE21_W, SKIZZE21_H_2)
        with Locations((170.5, -121.5)):
            Rectangle(SKIZZE21_W_2, SKIZZE21_H)
        with Locations((193, -121.5)):
            Rectangle(SKIZZE21_W, SKIZZE21_H)
        with Locations((193, -115.4)):
            Rectangle(SKIZZE21_W, SKIZZE21_H_2)
    extrude(amount=AUFSATZ_LINEAR_AUSTRAGEN15_DEPTH)

    # Skizze22 → Schnitt-Linear austragen5 (cut)
    with BuildSketch(Plane(origin=(0, 15, 0), x_dir=(1, 0, 0), z_dir=(0, 1, 0))):
        with Locations(Location((146.069548912, -58.232980191, 0), (0, 0, 270))):
            Circle(SKIZZE22_R)
        with Locations(Location((146.069548912, -13.432980191, 0), (0, 0, 270))):
            Circle(SKIZZE22_R)
        with Locations(Location((185.869548912, -58.232980191, 0), (0, 0, 270))):
            Circle(SKIZZE22_R)
        with Locations(Location((185.869548912, -13.432980191, 0), (0, 0, 270))):
            Circle(SKIZZE22_R)
    extrude(amount=-SCHNITT_LINEAR_AUSTRAGEN5_DEPTH, mode=Mode.SUBTRACT)

    # Skizze23 → Schnitt-Linear austragen6 (cut, two sides: drawn at the far end of the back side and taken through both)
    with BuildSketch(Plane(origin=(0, 15, 0), x_dir=(1, 0, 0), z_dir=(0, 1, 0)).offset(-SCHNITT_LINEAR_AUSTRAGEN6_DEPTH_BACK)):
        with Locations((-80, -1.728280721)):
            Rectangle(SKIZZE23_W, SKIZZE23_H)
    extrude(amount=SCHNITT_LINEAR_AUSTRAGEN6_DEPTH + SCHNITT_LINEAR_AUSTRAGEN6_DEPTH_BACK, mode=Mode.SUBTRACT)

    # Skizze24 → Schnitt-Linear austragen7 (cut)
    with BuildSketch(Plane.ZY.offset(-15)):
        with Locations((0, 12.5)):
            Rectangle(SKIZZE24_W, SKIZZE24_H)
    extrude(amount=-SCHNITT_LINEAR_AUSTRAGEN7_DEPTH, mode=Mode.SUBTRACT)

    # Skizze25 → Schnitt-Linear austragen8 (cut)
    with BuildSketch(Plane(origin=(0, 10, 0), x_dir=(1, 0, 0), z_dir=(0, 1, 0))):
        with Locations(Location((65, 0, 0), (0, 0, 270))):
            Circle(SKIZZE25_R)
    extrude(amount=-SCHNITT_LINEAR_AUSTRAGEN8_DEPTH, mode=Mode.SUBTRACT)

    # Skizze26 → Aufsatz-Linear austragen16 (add)
    with BuildSketch(Plane.XZ):
        with Locations((65, 0)):
            Circle(SKIZZE26_R)
    extrude(amount=-AUFSATZ_LINEAR_AUSTRAGEN16_DEPTH)

    # Skizze27 → Schnitt-Linear austragen10 (cut)
    with BuildSketch(Plane(origin=(0, 15, 0), x_dir=(1, 0, 0), z_dir=(0, 1, 0))):
        with Locations(Location((75, 10, 0), (0, 0, 270))):
            Circle(SKIZZE27_R)
        with Locations(Location((75, -10, 0), (0, 0, 270))):
            Circle(SKIZZE27_R)
        with Locations(Location((35, 10, 0), (0, 0, 270))):
            Circle(SKIZZE27_R)
        with Locations(Location((35, -10, 0), (0, 0, 270))):
            Circle(SKIZZE27_R)
    extrude(amount=-SCHNITT_LINEAR_AUSTRAGEN10_DEPTH, mode=Mode.SUBTRACT)

    # Skizze28 → Schnitt-Linear austragen11 (cut)
    with BuildSketch(Plane(origin=(0, 15, 0), x_dir=(1, 0, 0), z_dir=(0, 1, 0))):
        with Locations(Location((160, 14.85, 0), (0, 0, 270))):
            Circle(SKIZZE28_R)
        with Locations(Location((160, -14.85, 0), (0, 0, 270))):
            Circle(SKIZZE28_R)
        with Locations(Location((136.2, -14.85, 0), (0, 0, 270))):
            Circle(SKIZZE28_R)
        with Locations(Location((136.2, 14.85, 0), (0, 0, 270))):
            Circle(SKIZZE28_R)
    extrude(amount=-SCHNITT_LINEAR_AUSTRAGEN11_DEPTH, mode=Mode.SUBTRACT)

    # Skizze29 → Schnitt-Linear austragen13 (cut)
    with BuildSketch(Plane(origin=(0, 15, 0), x_dir=(1, 0, 0), z_dir=(0, 1, 0))):
        with Locations(Location((90, 120, 0), (0, 0, 270))):
            Circle(SKIZZE29_R)
        with Locations(Location((40, 120, 0), (0, 0, 270))):
            Circle(SKIZZE29_R)
        with Locations(Location((90, -120, 0), (0, 0, 270))):
            Circle(SKIZZE29_R)
        with Locations(Location((40, -120, 0), (0, 0, 270))):
            Circle(SKIZZE29_R)
    extrude(amount=-SCHNITT_LINEAR_AUSTRAGEN13_DEPTH, mode=Mode.SUBTRACT)

    # Skizze30 → Aufsatz-Linear austragen17 (add)
    with BuildSketch(Plane(origin=(0, 10, 0), x_dir=(1, 0, 0), z_dir=(0, 1, 0))):
        with Locations((55, 0)):
            Rectangle(SKIZZE30_W, SKIZZE30_H)
    extrude(amount=-AUFSATZ_LINEAR_AUSTRAGEN17_DEPTH)

    # Skizze31 → Schnitt-Linear austragen14 (cut)
    with BuildSketch(Plane(origin=(0, 10, 0), x_dir=(1, 0, 0), z_dir=(0, 1, 0))):
        with Locations(Location((55, 10, 0), (0, 0, 270))):
            Circle(SKIZZE31_R)
        with Locations(Location((55, -10, 0), (0, 0, 270))):
            Circle(SKIZZE31_R)
    extrude(amount=-SCHNITT_LINEAR_AUSTRAGEN14_DEPTH, mode=Mode.SUBTRACT)

    # Skizze32 → Aufsatz-Linear austragen18 (add)
    with BuildSketch(Plane.XZ.offset(AUFSATZ_LINEAR_START)):
        with Locations((75, -10)):
            Circle(SKIZZE32_R)
        with Locations((75, 10)):
            Circle(SKIZZE32_R_2)
        with Locations((35, 10)):
            Circle(SKIZZE32_R_3)
        with Locations((35, -10)):
            Circle(SKIZZE32_R_4)
    extrude(amount=AUFSATZ_LINEAR_AUSTRAGEN18_DEPTH)

    # Skizze35 → Schnitt-Linear austragen16 (cut)
    with BuildSketch(Plane(origin=(0, 15, 0), x_dir=(1, 0, 0), z_dir=(0, 1, 0))):
        with Locations(Location((151.210510648, 44.477580629, 0), (0, 0, 270))):
            Circle(SKIZZE35_R)
        with Locations(Location((191.010510648, 44.478487984, 0), (0, 0, 270))):
            Circle(SKIZZE35_R)
        with Locations(Location((151.210510648, 89.277580629, 0), (0, 0, 270))):
            Circle(SKIZZE35_R)
        with Locations(Location((191.010510648, 89.278487984, 0), (0, 0, 270))):
            Circle(SKIZZE35_R)
    extrude(amount=-SCHNITT_LINEAR_AUSTRAGEN16_DEPTH, mode=Mode.SUBTRACT)

    # Skizze36 → Aufsatz-Linear austragen19 (add)
    with BuildSketch(Plane(origin=(0, 15, 0), x_dir=(1, 0, 0), z_dir=(0, 1, 0))):
        with Locations((146.097099783, -61.909031942)):
            Circle(SKIZZE36_R)
        with Locations((186.685228416, -57.92608474)):
            Circle(SKIZZE36_R_2)
        with Locations((186.685228416, -12.786016446)):
            Circle(SKIZZE36_R_3)
        with Locations((146.097099783, -12.786016446)):
            Circle(SKIZZE36_R_4)
    extrude(amount=-AUFSATZ_LINEAR_AUSTRAGEN19_DEPTH)

    # Skizze39 → Schnitt-Linear austragen17 (cut)
    with BuildSketch(Plane(origin=(0, 15, 0), x_dir=(1, 0, 0), z_dir=(0, 1, 0))):
        with Locations((175, 0)):
            Rectangle(SKIZZE39_W, SKIZZE39_H)
    extrude(amount=SCHNITT_LINEAR_AUSTRAGEN17_DEPTH, mode=Mode.SUBTRACT)

    # Skizze40 → Schnitt-Linear austragen18 (cut)
    with BuildSketch(Plane(origin=(0, 15, 0), x_dir=(1, 0, 0), z_dir=(0, 1, 0))):
        with Locations((148.530078419, -40.830256609)):
            Rectangle(SKIZZE40_W, SKIZZE40_H)
    extrude(amount=SCHNITT_LINEAR_AUSTRAGEN18_DEPTH, mode=Mode.SUBTRACT)

    # Skizze41 → Schnitt-Linear austragen19 (cut)
    with BuildSketch(Plane(origin=(0, 15, 0), x_dir=(1, 0, 0), z_dir=(0, 1, 0))):
        with Locations((147.679542039, -99.644734483)):
            Rectangle(SKIZZE41_W, SKIZZE41_H)
    extrude(amount=SCHNITT_LINEAR_AUSTRAGEN19_DEPTH, mode=Mode.SUBTRACT)

    # Skizze42 → Aufsatz-Linear austragen20 (add)
    with BuildSketch(Plane(origin=(0, 15, 0), x_dir=(1, 0, 0), z_dir=(0, 1, 0))):
        Polygon((168.282600421, -120), (150.282600421, -120), (150.282600421, -79), (153, -79), (153, -74.066572639), (145, -74.066572639), (145, -100), (150, -100), (150, -125), (173, -125), (173, -74.066572639), (165, -74.066572639), (165, -79), (168.282600421, -79), align=None)
    extrude(amount=AUFSATZ_LINEAR_AUSTRAGEN20_DEPTH)


solid = part_1.part
